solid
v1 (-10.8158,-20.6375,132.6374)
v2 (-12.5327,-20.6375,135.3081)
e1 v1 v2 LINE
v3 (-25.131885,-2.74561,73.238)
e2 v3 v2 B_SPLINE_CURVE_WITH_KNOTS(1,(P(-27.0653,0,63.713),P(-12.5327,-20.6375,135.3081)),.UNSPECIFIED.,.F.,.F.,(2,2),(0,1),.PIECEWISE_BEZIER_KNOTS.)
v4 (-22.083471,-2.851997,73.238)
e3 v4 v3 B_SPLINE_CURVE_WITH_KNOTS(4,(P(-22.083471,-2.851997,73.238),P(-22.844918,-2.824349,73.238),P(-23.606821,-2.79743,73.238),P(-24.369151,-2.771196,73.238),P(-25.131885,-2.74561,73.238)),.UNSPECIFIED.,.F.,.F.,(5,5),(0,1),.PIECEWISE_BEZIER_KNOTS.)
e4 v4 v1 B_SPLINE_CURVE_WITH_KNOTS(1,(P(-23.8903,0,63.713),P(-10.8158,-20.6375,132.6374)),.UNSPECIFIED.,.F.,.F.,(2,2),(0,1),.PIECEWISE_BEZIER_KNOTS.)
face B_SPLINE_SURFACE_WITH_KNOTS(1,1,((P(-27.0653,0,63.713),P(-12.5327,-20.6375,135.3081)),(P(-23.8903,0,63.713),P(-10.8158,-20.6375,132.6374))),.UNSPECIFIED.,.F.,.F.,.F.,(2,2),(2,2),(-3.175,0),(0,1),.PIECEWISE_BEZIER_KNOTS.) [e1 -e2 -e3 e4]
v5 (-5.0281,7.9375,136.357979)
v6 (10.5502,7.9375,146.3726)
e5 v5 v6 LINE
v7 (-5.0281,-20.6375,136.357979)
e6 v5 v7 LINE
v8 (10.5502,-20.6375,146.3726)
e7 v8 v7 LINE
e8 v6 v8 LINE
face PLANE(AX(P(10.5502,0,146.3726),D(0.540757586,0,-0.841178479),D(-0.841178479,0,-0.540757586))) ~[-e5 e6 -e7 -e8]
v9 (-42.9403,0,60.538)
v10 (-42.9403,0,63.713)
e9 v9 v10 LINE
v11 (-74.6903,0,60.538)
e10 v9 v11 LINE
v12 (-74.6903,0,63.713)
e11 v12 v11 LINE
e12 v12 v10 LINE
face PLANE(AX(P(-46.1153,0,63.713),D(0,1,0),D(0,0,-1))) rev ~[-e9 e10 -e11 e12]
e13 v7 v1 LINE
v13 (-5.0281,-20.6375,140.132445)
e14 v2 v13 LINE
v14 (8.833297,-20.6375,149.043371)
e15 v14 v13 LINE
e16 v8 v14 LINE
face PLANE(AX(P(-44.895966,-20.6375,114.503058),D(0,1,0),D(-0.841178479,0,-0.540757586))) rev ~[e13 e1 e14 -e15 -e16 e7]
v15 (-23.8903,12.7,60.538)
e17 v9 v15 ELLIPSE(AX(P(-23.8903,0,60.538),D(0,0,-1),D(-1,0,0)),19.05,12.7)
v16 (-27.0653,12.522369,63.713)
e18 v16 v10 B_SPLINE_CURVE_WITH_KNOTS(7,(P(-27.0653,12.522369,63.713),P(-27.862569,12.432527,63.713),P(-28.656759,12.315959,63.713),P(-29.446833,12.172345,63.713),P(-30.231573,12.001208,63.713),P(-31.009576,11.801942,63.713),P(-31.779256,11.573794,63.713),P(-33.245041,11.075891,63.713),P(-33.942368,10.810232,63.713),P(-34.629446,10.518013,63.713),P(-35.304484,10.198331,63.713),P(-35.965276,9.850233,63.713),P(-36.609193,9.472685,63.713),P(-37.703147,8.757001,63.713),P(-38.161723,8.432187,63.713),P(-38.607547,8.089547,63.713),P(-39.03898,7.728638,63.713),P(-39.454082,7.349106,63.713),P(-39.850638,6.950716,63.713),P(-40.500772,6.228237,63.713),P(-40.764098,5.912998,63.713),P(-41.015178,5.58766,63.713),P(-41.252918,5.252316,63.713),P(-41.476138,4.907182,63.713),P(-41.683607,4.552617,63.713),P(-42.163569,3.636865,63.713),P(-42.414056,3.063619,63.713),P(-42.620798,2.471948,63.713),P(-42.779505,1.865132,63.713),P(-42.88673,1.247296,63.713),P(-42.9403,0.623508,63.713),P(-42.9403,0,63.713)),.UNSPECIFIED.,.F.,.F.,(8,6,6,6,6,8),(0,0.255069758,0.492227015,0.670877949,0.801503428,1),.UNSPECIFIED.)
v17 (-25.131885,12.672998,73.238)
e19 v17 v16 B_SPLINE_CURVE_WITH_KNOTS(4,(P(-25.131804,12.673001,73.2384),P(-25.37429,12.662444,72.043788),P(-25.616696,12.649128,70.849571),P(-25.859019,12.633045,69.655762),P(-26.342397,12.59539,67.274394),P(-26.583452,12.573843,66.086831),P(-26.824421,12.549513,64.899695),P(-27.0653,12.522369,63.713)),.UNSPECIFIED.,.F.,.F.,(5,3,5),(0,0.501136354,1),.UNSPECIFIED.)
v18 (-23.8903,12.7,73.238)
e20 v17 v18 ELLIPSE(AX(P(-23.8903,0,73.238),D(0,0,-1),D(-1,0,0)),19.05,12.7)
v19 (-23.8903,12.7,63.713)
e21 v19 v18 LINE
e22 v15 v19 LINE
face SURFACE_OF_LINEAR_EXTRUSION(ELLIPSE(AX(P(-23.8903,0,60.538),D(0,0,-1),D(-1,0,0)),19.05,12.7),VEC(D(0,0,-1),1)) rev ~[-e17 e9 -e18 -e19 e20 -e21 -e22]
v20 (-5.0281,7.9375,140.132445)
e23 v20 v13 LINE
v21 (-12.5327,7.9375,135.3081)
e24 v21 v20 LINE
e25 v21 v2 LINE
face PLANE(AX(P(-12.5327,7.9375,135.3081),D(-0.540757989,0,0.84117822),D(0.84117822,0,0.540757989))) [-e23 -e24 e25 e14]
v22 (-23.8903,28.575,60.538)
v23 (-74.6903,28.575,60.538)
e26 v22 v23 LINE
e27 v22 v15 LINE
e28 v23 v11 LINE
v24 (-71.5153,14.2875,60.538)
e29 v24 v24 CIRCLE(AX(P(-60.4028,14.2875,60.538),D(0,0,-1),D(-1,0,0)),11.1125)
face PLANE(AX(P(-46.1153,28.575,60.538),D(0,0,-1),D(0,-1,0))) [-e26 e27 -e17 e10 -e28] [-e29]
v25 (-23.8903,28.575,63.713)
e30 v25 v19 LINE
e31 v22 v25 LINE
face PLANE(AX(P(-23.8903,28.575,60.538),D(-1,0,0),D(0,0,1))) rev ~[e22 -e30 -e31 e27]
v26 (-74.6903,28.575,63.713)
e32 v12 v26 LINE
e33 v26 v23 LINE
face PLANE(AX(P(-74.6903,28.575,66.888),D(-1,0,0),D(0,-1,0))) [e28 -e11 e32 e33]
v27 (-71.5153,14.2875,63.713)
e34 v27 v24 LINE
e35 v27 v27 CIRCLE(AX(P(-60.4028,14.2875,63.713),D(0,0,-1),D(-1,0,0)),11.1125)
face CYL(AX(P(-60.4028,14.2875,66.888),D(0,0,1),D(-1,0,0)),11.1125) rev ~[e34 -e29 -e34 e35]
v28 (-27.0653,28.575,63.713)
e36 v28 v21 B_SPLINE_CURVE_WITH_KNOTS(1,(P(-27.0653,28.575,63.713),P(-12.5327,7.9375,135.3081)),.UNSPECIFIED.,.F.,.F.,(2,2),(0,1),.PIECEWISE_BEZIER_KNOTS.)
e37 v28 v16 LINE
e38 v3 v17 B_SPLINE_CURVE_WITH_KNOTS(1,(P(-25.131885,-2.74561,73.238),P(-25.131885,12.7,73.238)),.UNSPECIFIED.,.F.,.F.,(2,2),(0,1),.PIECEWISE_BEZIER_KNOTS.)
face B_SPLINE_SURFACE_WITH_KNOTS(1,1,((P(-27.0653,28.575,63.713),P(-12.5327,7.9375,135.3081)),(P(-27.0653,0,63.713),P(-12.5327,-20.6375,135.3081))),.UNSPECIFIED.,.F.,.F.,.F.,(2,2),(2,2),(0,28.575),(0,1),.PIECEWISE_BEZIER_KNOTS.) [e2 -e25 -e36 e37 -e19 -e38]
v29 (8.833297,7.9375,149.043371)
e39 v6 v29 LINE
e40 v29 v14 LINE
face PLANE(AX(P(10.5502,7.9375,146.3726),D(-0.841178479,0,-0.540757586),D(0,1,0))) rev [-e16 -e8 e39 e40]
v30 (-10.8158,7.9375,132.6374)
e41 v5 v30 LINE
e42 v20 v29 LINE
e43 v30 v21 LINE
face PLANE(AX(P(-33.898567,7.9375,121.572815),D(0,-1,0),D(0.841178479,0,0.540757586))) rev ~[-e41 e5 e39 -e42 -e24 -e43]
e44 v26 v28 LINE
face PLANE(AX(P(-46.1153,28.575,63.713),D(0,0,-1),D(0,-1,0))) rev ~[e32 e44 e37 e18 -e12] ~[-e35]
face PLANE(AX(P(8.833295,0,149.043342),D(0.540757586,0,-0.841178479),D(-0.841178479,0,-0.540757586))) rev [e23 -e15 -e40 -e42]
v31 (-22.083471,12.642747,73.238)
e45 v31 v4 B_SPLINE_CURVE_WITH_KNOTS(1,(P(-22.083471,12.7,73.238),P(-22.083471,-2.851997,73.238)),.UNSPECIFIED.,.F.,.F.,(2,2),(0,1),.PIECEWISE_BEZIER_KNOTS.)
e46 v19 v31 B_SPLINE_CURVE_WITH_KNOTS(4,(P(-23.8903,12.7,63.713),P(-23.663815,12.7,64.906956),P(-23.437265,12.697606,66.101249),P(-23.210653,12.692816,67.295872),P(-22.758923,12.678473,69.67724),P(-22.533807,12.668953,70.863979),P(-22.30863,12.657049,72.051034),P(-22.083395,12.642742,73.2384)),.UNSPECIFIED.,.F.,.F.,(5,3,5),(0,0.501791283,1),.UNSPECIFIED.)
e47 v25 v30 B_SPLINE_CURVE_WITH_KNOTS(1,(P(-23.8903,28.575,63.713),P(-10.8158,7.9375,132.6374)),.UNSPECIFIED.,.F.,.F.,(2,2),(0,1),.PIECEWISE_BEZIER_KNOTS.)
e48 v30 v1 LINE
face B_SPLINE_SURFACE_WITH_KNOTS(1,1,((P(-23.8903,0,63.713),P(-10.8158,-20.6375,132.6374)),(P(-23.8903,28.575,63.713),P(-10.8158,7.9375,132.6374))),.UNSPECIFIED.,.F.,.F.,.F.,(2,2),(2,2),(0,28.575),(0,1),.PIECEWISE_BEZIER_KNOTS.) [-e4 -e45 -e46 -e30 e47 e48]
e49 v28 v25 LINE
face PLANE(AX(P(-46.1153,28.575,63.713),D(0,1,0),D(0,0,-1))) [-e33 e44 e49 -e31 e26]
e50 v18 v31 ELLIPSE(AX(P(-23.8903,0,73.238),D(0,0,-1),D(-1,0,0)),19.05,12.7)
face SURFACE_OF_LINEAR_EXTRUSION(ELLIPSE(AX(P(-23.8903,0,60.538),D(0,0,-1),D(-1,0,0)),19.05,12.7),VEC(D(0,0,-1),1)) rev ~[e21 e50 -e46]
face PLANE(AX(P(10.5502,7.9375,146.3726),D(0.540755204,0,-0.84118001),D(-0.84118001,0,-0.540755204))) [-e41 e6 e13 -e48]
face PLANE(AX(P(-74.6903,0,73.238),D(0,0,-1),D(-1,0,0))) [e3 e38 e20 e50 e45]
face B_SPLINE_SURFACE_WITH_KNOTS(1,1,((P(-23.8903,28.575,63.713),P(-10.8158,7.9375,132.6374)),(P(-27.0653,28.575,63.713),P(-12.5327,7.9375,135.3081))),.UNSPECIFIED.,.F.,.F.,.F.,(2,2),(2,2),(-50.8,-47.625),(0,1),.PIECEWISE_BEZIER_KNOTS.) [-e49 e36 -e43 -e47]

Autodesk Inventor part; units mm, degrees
ref_plane "YZ Plane" through (0, 0, 0) normal (1, 0, 0) x (0, 1, 0)
ref_plane "XZ Plane" through (0, 0, 0) normal (0, 1, 0) x (-1, 0, 0)
sketch "Sketch1" plane through (0, 0, 0) normal (0, 1, 0) x (-1, 0, 0)
  line L0 (43.0137, 64.3915) -> (32.1817, 14.8739)
  line L1 (-10.5502, -12.5966) -> (-8.8333, -15.2673)
  line L2 (-8.8333, -15.2673) -> (35.0028, 12.913)
  line L3 (35.0028, 12.913) -> (46.1153, 63.713)
  line L4 (46.1153, 63.713) -> (43.0137, 64.3915)
  line L5 (-10.5502, -12.5966) -> (-10.5502, 12.913)
  line L6 (-10.5502, -12.5966) -> (32.1817, 14.8739)
  line L7 (46.1153, 63.713) -> (74.6903, 63.713)
  line L8 (74.6903, 63.713) -> (74.6903, 66.888)
  line L9 (74.6903, 66.888) -> (43.5598, 66.888)
  line L10 (43.0137, 64.3915) -> (43.5598, 66.888)
  point P0 (0, 0)
  dimension "d0" = 3.175
  dimension "d1" = 3.175
  dimension "d3" = 50.8
  dimension "d4" = 57.265
  dimension "d5" = 50.8
  dimension "d6" = 11.1125
  dimension "d7" = 28.575
  dimension "d8" = 3.175
extrude "Extrusion1" add sketch "Sketch1" along normal blind 28.575
sketch "Sketch2" plane through (-74.6903, 0, 66.888) normal (0, 0, 1) x (1, 0, 0)
  line L0 (28.575, 0) -> (0, 0) projected
  line L1 (0, 0) -> (0, 28.575) projected
  line L2 (28.575, 28.575) -> (0, 28.575) projected
  line L3 (28.575, 0) -> (28.575, 28.575) projected
  line L4 (28.575, 28.575) -> (0, 28.575) projected
  line L5 (0, 0) -> (0, 28.575) projected
  circle A0 centre (14.2875, 14.2875) radius 11.1125
  point P0 (74.6903, 0)
  point P1 (14.2875, 28.575)
  point P2 (0, 14.2875)
  dimension "d11" = 22.225
extrude "Extrusion2" cut sketch "Sketch2" against normal blind 28.575 contours A0
sketch "Sketch3" plane through (10.5502, 0, -12.5966) normal (0.5407576, 0, 0.8411785) x (0.8411785, 0, -0.5407576)
  line L0 (-50.8, 0) -> (-50.8, 28.575) projected
  line L1 (-50.8, 7.9375) -> (0, 7.9375)
  line L2 (0, 7.9375) -> (0, -20.6375)
  line L3 (0, -20.6375) -> (-50.8, -20.6375)
  line L4 (-50.8, -20.6375) -> (-50.8, 7.9375)
  line L5 (-50.8, 28.575) -> (0, 28.575) projected
  point P0 (-15.6863, 0)
  dimension "d14" = 50.8
  dimension "d15" = 28.575
  dimension "d16" = 20.6375
sketch "Sketch4" plane through (-32.1817, 0, 14.8739) normal (0.9769, 0, 0.2136969) x (0.2136969, 0, -0.9769)
  line L0 (-53.2441, 0) -> (-53.2441, 28.575) projected
  line L1 (-53.2441, 28.575) -> (0, 7.9375)
  line L2 (0, 0) -> (0, 28.575) projected
  line L3 (0, 7.9375) -> (0, -20.6375)
  line L4 (0, -20.6375) -> (-53.2441, 0)
  line L5 (-53.2441, 28.575) -> (-53.2441, 0)
  point P0 (21.4074, 0)
  dimension "d17" = 20.6375
  dimension "d18" = 28.575
sketch "Sketch5" plane through (-32.1817, 0, 14.8739) normal (0.9769, 0, 0.2136969) x (0.2136969, 0, -0.9769)
  line L0 (-53.2441, 41.9678) -> (42.8737, 41.9678)
  line L1 (42.8737, 41.9678) -> (42.8737, -28.4609)
  line L2 (42.8737, -28.4609) -> (-53.2441, -28.4609)
  line L3 (-53.2441, -28.4609) -> (-53.2441, 41.9678)
  point P0 (21.4074, 0)
extrude "Extrusion3" cut sketch "Sketch5" along normal blind 50.8 and the other way blind 3.175
extrude "Extrusion4" add sketch "Sketch4" against normal blind 3.175
extrude "Extrusion5" add sketch "Sketch3" against normal blind 3.175
sketch "Sketch6" plane through (8.8333, 0, -15.2673) normal (-0.5407576, 0, -0.8411785) x (-0.8411785, 0, 0.5407576)
  line L0 (50.8, 7.9375) -> (0, 7.9375) projected
  line L1 (50.8, 7.9375) -> (63.8738, 7.9375)
  line L2 (63.8738, 7.9375) -> (63.8738, -20.6375)
  line L3 (63.8738, -20.6375) -> (50.8, -20.6375)
  line L4 (50.8, -20.6375) -> (50.8, 7.9375)
  point P0 (15.6863, 0)
extrude "Extrusion6" add sketch "Sketch6" against normal blind 3.175
sketch "Sketch7" plane through (-35.2833, 0, 14.1954) normal (-0.9769, 0, -0.2136969) x (-0.2136969, 0, 0.9769)
  line L0 (50.6885, 27.5845) -> (0, 7.9375) projected
  line L1 (3.1832, -19.4037) -> (53.2441, 0) projected
  line L2 (0, 7.9375) -> (3.1832, 7.9375) projected
  line L3 (0, 7.9375) -> (-56.9759, -14.1465)
  line L4 (-56.9759, -14.1465) -> (-50.1301, -40.068)
  line L5 (53.2441, 0) -> (0, -20.6375) projected
  line L6 (-50.1301, -40.068) -> (0, -20.6375)
  line L7 (0, 7.9375) -> (-35.9676, 7.9375) projected
  line L8 (0, 7.9375) -> (0, -20.6375)
  line L9 (11.5155, 12.4009) -> (21.1446, -12.4418)
  line L10 (-34.1585, 31.8696) -> (27.6424, 31.8696)
  line L11 (27.6424, 31.8696) -> (27.6424, -37.0154)
  line L12 (27.6424, -37.0154) -> (-34.1585, -37.0154)
  line L13 (-34.1585, -37.0154) -> (-34.1585, 31.8696)
  point P0 (-21.4074, 0)
extrude "Extrusion7" cut sketch "Sketch7" along normal blind 25.4 contours L9 L1 L5 L8 L0 | L0 L7 L13 L10 L11 | L0 L11 L1 L9 | L8 L6 L13 L3 | L3 L13 L7 | L1 L11 L12 L13 L6 L5
mirror "Mirror1" about plane through (-74.6903, 0, 66.888) normal (0, 0, 1)
sketch "Sketch8" plane through (0, 28.575, 0) normal (0, 1, 0) x (1, 0, 0)
  line L0 (-74.6903, -63.713) -> (-74.6903, -70.063) projected
  line L1 (-74.6903, -66.888) -> (15.7413, -66.888)
  line L2 (15.7413, -66.888) -> (15.7413, 23.0839)
  line L3 (15.7413, 23.0839) -> (-74.6903, 23.0839)
  line L4 (-74.6903, 23.0839) -> (-74.6903, -66.888)
  point P0 (0, 0)
extrude "Extrusion8" cut sketch "Sketch8" against normal blind 49.2125
ref_plane "Work Plane1" through (-7.3684, -20.6375, 113.4742) normal (0.9769, 0, -0.2136969) x (-0.2136969, 0, -0.9769)
sketch "Sketch10" plane through (0, 28.575, 0) normal (0, 1, 0) x (1, 0, 0)
  line L0 (-1.9264, -138.3519) -> (-5.0281, -139.0304)
  line L1 (-1.9264, -138.3519) -> (-13.3045, -86.3378) projected
  line L2 (-46.6614, -54.5282) -> (-5.0281, -54.5282)
  line L3 (-5.0281, -54.5282) -> (-5.0281, -144.0467)
  line L4 (-5.0281, -144.0467) -> (-46.6614, -144.0467)
  line L5 (-46.6614, -144.0467) -> (-46.6614, -54.5282)
  point P0 (0, 0)
  dimension "d35" = 3.175
extrude "Extrusion9" cut sketch "Sketch10" against normal blind 57.15 contours L3 L4 L5 L2
sketch "Sketch11" plane through (0, 28.575, 0) normal (0, 1, 0) x (1, 0, 0)
  line L0 (-74.6903, -66.888) -> (-46.6614, -66.888) projected
  line L1 (-46.6614, -66.888) -> (-46.1153, -66.888)
  line L2 (-46.1153, -66.888) -> (-46.1153, -70.063)
  line L3 (-46.1153, -70.063) -> (-46.6614, -70.063)
  line L4 (-46.6614, -70.063) -> (-46.6614, -66.888)
  line L5 (-74.6903, -66.888) -> (-74.6903, -70.063) projected
  point P0 (0, 0)
  dimension "d38" = 28.575
extrude "Extrusion10" add sketch "Sketch11" against normal up to surface (28.575 mm away)
sketch "Sketch12" plane through (-74.6903, 0, 66.888) normal (0, 0, -1) x (-1, 0, 0)
  line L0 (0, 0) -> (-28.575, 0) projected
  line L1 (0, 28.575) -> (0, 0) projected
  line L2 (-28.575, 28.575) -> (0, 28.575) projected
  line L3 (-28.575, 28.575) -> (-28.575, 0) projected
  circle A0 centre (-14.2875, 14.2875) radius 11.1125 projected
  point P0 (-74.6903, 0)
extrude "Extrusion11" add sketch "Sketch12" along normal blind 6.35
sketch "Sketch13" plane through (-74.6903, 0, 70.063) normal (0, 0, 1) x (1, 0, 0)
  line L0 (28.575, 28.575) -> (0, 28.575) projected
  line L1 (0, 0) -> (0, 28.575) projected
  line L2 (28.575, 0) -> (0, 0) projected
  line L3 (28.575, 28.575) -> (28.575, 0) projected
  circle A0 centre (14.2875, 14.2875) radius 11.1125 projected
  point P0 (74.6903, 0)
extrude "Extrusion12" cut sketch "Sketch13" against normal blind 6.35
sketch "Sketch14" plane through (-7.3684, -20.6375, 113.4742) normal (0.9769, 0, -0.2136969) x (-0.2136969, 0, -0.9769)
  line L0 (-22.8553, 28.575) -> (-26.5426, 28.575) projected
  line L1 (59.9935, 49.2125) -> (59.9935, 20.6375) projected
  line L2 (-22.8553, 28.575) -> (59.9935, 49.2125)
  line L3 (59.9935, 20.6375) -> (66.0999, 20.6375) projected
  line L4 (59.9935, 49.2125) -> (59.9935, 20.6375)
  line L5 (-22.8553, 0) -> (-22.8553, 28.575) projected
  line L6 (59.9935, 20.6375) -> (-22.8553, 0)
  line L7 (-22.8553, 0) -> (-22.8553, 28.575)
  point P0 (109.2784, 20.6375)
extrude "Extrusion13" add sketch "Sketch14" against normal blind 3.175
sketch "Sketch16" plane through (-46.1153, 0, 60.538) normal (1, 0, 0) x (0, 0, -1)
  line L0 (-3.175, 28.575) -> (-3.175, 0) projected
  line L1 (-3.175, 0) -> (0, 0) projected
  line L2 (0, 28.575) -> (0, 0) projected
  line L3 (-3.175, 28.575) -> (0, 28.575) projected
  point P0 (60.538, 0)
extrude "Extrusion14" add sketch "Sketch16" along normal blind 33.3375
sketch "Sketch17" plane through (-7.3684, -20.6375, 113.4742) normal (0.9769, 0, -0.2136969) x (-0.2136969, 0, -0.9769)
  line L0 (39.8727, 61.7245) -> (70.5453, 61.7245)
  line L1 (70.5453, 61.7245) -> (70.5453, 3.8032)
  line L2 (70.5453, 3.8032) -> (39.8727, 3.8032)
  line L3 (39.8727, 3.8032) -> (39.8727, 61.7245)
  point P0 (109.2784, 20.6375)
extrude "Extrusion15" cut sketch "Sketch17" along normal blind 33.3375
sketch "Sketch18" plane through (0, 28.575, 0) normal (0, 1, 0) x (1, 0, 0)
  line L0 (-74.6903, -60.538) -> (-18.9482, -60.538) projected
  line L1 (-26.1324, -60.538) -> (-14.0387, -60.538)
  line L2 (-14.0387, -60.538) -> (-14.0387, -48.514)
  line L3 (-14.0387, -48.514) -> (-26.1324, -48.514)
  line L4 (-26.1324, -48.514) -> (-26.1324, -60.538)
  point P0 (0, 0)
extrude "Extrusion16" cut sketch "Sketch18" against normal blind 33.3375
sketch "Sketch19" plane through (0, 28.575, 0) normal (0, 1, 0) x (1, 0, 0)
  line L0 (-21.5038, -63.713) -> (-74.6903, -63.713) projected
  line L1 (-28.5092, -63.713) -> (0.9764, -63.713)
  line L2 (0.9764, -63.713) -> (0.9764, -136.358)
  line L3 (0.9764, -136.358) -> (-28.5092, -136.358)
  line L4 (-28.5092, -136.358) -> (-28.5092, -63.713)
  point P0 (0, 0)
extrude "Extrusion17" cut sketch "Sketch19" against normal blind 82.55
sketch "Sketch20" plane through (0, 28.575, 0) normal (0, 1, 0) x (1, 0, 0)
  line L0 (-74.6903, -60.538) -> (-22.1983, -60.538) projected
  line L1 (-21.5038, -63.713) -> (-74.6903, -63.713) projected
  line L2 (-74.6903, -60.538) -> (-23.8903, -60.538)
  line L3 (-23.8903, -60.538) -> (-23.8903, -63.713)
  line L4 (-23.8903, -63.713) -> (-74.6903, -63.713)
  line L5 (-74.6903, -63.713) -> (-74.6903, -60.538)
  line L6 (-23.8903, -55.4967) -> (-9.2163, -55.4967)
  line L7 (-9.2163, -55.4967) -> (-9.2163, -75.9107)
  line L8 (-9.2163, -75.9107) -> (-23.8903, -75.9107)
  line L9 (-23.8903, -75.9107) -> (-23.8903, -55.4967)
  point P0 (0, 0)
  dimension "d55" = 50.8
extrude "Extrusion18" cut sketch "Sketch20" against normal blind 82.55 contours L9 L6 L7 L8 L3
sketch "Sketch21" plane through (-5.0281, 7.9375, 140.1325) normal (0, 1, 0) x (1, 0, 0)
  line L0 (15.5783, -6.2401) -> (13.8614, -8.9109) projected
  line L1 (13.8614, -8.9109) -> (15.5783, -6.2401)
  line L2 (15.5783, -6.2401) -> (-5.7877, 7.4951)
  line L3 (-5.7877, 7.4951) -> (-7.5046, 4.8244)
  line L4 (-7.5046, 4.8244) -> (13.8614, -8.9109)
  point P0 (5.0281, 140.1325)
  dimension "d58" = 25.4
extrude "Extrusion19" add sketch "Sketch21" against normal blind 28.575
sketch "Sketch22" plane through (-5.6127, 7.9375, 136.358) normal (0, 1, 0) x (1, 0, 0)
  line L0 (-48.2657, 34.2615) -> (88.3828, 30.5881)
  line L1 (88.3828, 30.5881) -> (85.9509, -59.8767)
  line L2 (85.9509, -59.8767) -> (-50.6975, -56.2034)
  line L3 (-50.6975, -56.2034) -> (-48.2657, 34.2615)
  point P0 (5.6127, 136.358)
extrude "Extrusion20" cut sketch "Sketch22" along normal blind 28.575
sketch "Sketch23" plane through (-74.6903, 0, 63.713) normal (0, 0, 1) x (1, 0, 0)
  line L0 (0, 28.575) -> (50.8, 28.575) projected
  line L1 (50.8, 0) -> (0, 0) projected
  line L2 (50.8, 28.575) -> (47.625, 28.575)
  line L3 (47.625, 28.575) -> (47.625, 0)
  line L4 (47.625, 0) -> (50.8, 0)
  line L5 (50.8, 0) -> (50.8, 28.575)
  point P0 (74.6903, 0)
  dimension "d63" = 3.175
loft "Loft1" add profiles "Sketch23" section 2 edges at (-11.6742, 7.9375, 133.9728) (-10.8157, -6.35, 132.6374) (-11.6742, -20.6375, 133.9728) (-12.5326, -6.35, 135.3081)
sketch "Sketch26" plane through (-74.6903, 0, 60.538) normal (0, 0, -1) x (-1, 0, 0)
  line L0 (-50.8, 0) -> (-50.8, 28.575) projected
  ellipse E0 centre (-50.8, 0) end of major axis (-31.75, 0) minor radius 12.7
  point P0 (-74.6903, 0)
  dimension "d71" = 12.7
  dimension "d72" = 19.05
extrude "Extrusion22" cut sketch "Sketch26" against normal blind 12.7
properties part number "Spinner to Top Other Side"
